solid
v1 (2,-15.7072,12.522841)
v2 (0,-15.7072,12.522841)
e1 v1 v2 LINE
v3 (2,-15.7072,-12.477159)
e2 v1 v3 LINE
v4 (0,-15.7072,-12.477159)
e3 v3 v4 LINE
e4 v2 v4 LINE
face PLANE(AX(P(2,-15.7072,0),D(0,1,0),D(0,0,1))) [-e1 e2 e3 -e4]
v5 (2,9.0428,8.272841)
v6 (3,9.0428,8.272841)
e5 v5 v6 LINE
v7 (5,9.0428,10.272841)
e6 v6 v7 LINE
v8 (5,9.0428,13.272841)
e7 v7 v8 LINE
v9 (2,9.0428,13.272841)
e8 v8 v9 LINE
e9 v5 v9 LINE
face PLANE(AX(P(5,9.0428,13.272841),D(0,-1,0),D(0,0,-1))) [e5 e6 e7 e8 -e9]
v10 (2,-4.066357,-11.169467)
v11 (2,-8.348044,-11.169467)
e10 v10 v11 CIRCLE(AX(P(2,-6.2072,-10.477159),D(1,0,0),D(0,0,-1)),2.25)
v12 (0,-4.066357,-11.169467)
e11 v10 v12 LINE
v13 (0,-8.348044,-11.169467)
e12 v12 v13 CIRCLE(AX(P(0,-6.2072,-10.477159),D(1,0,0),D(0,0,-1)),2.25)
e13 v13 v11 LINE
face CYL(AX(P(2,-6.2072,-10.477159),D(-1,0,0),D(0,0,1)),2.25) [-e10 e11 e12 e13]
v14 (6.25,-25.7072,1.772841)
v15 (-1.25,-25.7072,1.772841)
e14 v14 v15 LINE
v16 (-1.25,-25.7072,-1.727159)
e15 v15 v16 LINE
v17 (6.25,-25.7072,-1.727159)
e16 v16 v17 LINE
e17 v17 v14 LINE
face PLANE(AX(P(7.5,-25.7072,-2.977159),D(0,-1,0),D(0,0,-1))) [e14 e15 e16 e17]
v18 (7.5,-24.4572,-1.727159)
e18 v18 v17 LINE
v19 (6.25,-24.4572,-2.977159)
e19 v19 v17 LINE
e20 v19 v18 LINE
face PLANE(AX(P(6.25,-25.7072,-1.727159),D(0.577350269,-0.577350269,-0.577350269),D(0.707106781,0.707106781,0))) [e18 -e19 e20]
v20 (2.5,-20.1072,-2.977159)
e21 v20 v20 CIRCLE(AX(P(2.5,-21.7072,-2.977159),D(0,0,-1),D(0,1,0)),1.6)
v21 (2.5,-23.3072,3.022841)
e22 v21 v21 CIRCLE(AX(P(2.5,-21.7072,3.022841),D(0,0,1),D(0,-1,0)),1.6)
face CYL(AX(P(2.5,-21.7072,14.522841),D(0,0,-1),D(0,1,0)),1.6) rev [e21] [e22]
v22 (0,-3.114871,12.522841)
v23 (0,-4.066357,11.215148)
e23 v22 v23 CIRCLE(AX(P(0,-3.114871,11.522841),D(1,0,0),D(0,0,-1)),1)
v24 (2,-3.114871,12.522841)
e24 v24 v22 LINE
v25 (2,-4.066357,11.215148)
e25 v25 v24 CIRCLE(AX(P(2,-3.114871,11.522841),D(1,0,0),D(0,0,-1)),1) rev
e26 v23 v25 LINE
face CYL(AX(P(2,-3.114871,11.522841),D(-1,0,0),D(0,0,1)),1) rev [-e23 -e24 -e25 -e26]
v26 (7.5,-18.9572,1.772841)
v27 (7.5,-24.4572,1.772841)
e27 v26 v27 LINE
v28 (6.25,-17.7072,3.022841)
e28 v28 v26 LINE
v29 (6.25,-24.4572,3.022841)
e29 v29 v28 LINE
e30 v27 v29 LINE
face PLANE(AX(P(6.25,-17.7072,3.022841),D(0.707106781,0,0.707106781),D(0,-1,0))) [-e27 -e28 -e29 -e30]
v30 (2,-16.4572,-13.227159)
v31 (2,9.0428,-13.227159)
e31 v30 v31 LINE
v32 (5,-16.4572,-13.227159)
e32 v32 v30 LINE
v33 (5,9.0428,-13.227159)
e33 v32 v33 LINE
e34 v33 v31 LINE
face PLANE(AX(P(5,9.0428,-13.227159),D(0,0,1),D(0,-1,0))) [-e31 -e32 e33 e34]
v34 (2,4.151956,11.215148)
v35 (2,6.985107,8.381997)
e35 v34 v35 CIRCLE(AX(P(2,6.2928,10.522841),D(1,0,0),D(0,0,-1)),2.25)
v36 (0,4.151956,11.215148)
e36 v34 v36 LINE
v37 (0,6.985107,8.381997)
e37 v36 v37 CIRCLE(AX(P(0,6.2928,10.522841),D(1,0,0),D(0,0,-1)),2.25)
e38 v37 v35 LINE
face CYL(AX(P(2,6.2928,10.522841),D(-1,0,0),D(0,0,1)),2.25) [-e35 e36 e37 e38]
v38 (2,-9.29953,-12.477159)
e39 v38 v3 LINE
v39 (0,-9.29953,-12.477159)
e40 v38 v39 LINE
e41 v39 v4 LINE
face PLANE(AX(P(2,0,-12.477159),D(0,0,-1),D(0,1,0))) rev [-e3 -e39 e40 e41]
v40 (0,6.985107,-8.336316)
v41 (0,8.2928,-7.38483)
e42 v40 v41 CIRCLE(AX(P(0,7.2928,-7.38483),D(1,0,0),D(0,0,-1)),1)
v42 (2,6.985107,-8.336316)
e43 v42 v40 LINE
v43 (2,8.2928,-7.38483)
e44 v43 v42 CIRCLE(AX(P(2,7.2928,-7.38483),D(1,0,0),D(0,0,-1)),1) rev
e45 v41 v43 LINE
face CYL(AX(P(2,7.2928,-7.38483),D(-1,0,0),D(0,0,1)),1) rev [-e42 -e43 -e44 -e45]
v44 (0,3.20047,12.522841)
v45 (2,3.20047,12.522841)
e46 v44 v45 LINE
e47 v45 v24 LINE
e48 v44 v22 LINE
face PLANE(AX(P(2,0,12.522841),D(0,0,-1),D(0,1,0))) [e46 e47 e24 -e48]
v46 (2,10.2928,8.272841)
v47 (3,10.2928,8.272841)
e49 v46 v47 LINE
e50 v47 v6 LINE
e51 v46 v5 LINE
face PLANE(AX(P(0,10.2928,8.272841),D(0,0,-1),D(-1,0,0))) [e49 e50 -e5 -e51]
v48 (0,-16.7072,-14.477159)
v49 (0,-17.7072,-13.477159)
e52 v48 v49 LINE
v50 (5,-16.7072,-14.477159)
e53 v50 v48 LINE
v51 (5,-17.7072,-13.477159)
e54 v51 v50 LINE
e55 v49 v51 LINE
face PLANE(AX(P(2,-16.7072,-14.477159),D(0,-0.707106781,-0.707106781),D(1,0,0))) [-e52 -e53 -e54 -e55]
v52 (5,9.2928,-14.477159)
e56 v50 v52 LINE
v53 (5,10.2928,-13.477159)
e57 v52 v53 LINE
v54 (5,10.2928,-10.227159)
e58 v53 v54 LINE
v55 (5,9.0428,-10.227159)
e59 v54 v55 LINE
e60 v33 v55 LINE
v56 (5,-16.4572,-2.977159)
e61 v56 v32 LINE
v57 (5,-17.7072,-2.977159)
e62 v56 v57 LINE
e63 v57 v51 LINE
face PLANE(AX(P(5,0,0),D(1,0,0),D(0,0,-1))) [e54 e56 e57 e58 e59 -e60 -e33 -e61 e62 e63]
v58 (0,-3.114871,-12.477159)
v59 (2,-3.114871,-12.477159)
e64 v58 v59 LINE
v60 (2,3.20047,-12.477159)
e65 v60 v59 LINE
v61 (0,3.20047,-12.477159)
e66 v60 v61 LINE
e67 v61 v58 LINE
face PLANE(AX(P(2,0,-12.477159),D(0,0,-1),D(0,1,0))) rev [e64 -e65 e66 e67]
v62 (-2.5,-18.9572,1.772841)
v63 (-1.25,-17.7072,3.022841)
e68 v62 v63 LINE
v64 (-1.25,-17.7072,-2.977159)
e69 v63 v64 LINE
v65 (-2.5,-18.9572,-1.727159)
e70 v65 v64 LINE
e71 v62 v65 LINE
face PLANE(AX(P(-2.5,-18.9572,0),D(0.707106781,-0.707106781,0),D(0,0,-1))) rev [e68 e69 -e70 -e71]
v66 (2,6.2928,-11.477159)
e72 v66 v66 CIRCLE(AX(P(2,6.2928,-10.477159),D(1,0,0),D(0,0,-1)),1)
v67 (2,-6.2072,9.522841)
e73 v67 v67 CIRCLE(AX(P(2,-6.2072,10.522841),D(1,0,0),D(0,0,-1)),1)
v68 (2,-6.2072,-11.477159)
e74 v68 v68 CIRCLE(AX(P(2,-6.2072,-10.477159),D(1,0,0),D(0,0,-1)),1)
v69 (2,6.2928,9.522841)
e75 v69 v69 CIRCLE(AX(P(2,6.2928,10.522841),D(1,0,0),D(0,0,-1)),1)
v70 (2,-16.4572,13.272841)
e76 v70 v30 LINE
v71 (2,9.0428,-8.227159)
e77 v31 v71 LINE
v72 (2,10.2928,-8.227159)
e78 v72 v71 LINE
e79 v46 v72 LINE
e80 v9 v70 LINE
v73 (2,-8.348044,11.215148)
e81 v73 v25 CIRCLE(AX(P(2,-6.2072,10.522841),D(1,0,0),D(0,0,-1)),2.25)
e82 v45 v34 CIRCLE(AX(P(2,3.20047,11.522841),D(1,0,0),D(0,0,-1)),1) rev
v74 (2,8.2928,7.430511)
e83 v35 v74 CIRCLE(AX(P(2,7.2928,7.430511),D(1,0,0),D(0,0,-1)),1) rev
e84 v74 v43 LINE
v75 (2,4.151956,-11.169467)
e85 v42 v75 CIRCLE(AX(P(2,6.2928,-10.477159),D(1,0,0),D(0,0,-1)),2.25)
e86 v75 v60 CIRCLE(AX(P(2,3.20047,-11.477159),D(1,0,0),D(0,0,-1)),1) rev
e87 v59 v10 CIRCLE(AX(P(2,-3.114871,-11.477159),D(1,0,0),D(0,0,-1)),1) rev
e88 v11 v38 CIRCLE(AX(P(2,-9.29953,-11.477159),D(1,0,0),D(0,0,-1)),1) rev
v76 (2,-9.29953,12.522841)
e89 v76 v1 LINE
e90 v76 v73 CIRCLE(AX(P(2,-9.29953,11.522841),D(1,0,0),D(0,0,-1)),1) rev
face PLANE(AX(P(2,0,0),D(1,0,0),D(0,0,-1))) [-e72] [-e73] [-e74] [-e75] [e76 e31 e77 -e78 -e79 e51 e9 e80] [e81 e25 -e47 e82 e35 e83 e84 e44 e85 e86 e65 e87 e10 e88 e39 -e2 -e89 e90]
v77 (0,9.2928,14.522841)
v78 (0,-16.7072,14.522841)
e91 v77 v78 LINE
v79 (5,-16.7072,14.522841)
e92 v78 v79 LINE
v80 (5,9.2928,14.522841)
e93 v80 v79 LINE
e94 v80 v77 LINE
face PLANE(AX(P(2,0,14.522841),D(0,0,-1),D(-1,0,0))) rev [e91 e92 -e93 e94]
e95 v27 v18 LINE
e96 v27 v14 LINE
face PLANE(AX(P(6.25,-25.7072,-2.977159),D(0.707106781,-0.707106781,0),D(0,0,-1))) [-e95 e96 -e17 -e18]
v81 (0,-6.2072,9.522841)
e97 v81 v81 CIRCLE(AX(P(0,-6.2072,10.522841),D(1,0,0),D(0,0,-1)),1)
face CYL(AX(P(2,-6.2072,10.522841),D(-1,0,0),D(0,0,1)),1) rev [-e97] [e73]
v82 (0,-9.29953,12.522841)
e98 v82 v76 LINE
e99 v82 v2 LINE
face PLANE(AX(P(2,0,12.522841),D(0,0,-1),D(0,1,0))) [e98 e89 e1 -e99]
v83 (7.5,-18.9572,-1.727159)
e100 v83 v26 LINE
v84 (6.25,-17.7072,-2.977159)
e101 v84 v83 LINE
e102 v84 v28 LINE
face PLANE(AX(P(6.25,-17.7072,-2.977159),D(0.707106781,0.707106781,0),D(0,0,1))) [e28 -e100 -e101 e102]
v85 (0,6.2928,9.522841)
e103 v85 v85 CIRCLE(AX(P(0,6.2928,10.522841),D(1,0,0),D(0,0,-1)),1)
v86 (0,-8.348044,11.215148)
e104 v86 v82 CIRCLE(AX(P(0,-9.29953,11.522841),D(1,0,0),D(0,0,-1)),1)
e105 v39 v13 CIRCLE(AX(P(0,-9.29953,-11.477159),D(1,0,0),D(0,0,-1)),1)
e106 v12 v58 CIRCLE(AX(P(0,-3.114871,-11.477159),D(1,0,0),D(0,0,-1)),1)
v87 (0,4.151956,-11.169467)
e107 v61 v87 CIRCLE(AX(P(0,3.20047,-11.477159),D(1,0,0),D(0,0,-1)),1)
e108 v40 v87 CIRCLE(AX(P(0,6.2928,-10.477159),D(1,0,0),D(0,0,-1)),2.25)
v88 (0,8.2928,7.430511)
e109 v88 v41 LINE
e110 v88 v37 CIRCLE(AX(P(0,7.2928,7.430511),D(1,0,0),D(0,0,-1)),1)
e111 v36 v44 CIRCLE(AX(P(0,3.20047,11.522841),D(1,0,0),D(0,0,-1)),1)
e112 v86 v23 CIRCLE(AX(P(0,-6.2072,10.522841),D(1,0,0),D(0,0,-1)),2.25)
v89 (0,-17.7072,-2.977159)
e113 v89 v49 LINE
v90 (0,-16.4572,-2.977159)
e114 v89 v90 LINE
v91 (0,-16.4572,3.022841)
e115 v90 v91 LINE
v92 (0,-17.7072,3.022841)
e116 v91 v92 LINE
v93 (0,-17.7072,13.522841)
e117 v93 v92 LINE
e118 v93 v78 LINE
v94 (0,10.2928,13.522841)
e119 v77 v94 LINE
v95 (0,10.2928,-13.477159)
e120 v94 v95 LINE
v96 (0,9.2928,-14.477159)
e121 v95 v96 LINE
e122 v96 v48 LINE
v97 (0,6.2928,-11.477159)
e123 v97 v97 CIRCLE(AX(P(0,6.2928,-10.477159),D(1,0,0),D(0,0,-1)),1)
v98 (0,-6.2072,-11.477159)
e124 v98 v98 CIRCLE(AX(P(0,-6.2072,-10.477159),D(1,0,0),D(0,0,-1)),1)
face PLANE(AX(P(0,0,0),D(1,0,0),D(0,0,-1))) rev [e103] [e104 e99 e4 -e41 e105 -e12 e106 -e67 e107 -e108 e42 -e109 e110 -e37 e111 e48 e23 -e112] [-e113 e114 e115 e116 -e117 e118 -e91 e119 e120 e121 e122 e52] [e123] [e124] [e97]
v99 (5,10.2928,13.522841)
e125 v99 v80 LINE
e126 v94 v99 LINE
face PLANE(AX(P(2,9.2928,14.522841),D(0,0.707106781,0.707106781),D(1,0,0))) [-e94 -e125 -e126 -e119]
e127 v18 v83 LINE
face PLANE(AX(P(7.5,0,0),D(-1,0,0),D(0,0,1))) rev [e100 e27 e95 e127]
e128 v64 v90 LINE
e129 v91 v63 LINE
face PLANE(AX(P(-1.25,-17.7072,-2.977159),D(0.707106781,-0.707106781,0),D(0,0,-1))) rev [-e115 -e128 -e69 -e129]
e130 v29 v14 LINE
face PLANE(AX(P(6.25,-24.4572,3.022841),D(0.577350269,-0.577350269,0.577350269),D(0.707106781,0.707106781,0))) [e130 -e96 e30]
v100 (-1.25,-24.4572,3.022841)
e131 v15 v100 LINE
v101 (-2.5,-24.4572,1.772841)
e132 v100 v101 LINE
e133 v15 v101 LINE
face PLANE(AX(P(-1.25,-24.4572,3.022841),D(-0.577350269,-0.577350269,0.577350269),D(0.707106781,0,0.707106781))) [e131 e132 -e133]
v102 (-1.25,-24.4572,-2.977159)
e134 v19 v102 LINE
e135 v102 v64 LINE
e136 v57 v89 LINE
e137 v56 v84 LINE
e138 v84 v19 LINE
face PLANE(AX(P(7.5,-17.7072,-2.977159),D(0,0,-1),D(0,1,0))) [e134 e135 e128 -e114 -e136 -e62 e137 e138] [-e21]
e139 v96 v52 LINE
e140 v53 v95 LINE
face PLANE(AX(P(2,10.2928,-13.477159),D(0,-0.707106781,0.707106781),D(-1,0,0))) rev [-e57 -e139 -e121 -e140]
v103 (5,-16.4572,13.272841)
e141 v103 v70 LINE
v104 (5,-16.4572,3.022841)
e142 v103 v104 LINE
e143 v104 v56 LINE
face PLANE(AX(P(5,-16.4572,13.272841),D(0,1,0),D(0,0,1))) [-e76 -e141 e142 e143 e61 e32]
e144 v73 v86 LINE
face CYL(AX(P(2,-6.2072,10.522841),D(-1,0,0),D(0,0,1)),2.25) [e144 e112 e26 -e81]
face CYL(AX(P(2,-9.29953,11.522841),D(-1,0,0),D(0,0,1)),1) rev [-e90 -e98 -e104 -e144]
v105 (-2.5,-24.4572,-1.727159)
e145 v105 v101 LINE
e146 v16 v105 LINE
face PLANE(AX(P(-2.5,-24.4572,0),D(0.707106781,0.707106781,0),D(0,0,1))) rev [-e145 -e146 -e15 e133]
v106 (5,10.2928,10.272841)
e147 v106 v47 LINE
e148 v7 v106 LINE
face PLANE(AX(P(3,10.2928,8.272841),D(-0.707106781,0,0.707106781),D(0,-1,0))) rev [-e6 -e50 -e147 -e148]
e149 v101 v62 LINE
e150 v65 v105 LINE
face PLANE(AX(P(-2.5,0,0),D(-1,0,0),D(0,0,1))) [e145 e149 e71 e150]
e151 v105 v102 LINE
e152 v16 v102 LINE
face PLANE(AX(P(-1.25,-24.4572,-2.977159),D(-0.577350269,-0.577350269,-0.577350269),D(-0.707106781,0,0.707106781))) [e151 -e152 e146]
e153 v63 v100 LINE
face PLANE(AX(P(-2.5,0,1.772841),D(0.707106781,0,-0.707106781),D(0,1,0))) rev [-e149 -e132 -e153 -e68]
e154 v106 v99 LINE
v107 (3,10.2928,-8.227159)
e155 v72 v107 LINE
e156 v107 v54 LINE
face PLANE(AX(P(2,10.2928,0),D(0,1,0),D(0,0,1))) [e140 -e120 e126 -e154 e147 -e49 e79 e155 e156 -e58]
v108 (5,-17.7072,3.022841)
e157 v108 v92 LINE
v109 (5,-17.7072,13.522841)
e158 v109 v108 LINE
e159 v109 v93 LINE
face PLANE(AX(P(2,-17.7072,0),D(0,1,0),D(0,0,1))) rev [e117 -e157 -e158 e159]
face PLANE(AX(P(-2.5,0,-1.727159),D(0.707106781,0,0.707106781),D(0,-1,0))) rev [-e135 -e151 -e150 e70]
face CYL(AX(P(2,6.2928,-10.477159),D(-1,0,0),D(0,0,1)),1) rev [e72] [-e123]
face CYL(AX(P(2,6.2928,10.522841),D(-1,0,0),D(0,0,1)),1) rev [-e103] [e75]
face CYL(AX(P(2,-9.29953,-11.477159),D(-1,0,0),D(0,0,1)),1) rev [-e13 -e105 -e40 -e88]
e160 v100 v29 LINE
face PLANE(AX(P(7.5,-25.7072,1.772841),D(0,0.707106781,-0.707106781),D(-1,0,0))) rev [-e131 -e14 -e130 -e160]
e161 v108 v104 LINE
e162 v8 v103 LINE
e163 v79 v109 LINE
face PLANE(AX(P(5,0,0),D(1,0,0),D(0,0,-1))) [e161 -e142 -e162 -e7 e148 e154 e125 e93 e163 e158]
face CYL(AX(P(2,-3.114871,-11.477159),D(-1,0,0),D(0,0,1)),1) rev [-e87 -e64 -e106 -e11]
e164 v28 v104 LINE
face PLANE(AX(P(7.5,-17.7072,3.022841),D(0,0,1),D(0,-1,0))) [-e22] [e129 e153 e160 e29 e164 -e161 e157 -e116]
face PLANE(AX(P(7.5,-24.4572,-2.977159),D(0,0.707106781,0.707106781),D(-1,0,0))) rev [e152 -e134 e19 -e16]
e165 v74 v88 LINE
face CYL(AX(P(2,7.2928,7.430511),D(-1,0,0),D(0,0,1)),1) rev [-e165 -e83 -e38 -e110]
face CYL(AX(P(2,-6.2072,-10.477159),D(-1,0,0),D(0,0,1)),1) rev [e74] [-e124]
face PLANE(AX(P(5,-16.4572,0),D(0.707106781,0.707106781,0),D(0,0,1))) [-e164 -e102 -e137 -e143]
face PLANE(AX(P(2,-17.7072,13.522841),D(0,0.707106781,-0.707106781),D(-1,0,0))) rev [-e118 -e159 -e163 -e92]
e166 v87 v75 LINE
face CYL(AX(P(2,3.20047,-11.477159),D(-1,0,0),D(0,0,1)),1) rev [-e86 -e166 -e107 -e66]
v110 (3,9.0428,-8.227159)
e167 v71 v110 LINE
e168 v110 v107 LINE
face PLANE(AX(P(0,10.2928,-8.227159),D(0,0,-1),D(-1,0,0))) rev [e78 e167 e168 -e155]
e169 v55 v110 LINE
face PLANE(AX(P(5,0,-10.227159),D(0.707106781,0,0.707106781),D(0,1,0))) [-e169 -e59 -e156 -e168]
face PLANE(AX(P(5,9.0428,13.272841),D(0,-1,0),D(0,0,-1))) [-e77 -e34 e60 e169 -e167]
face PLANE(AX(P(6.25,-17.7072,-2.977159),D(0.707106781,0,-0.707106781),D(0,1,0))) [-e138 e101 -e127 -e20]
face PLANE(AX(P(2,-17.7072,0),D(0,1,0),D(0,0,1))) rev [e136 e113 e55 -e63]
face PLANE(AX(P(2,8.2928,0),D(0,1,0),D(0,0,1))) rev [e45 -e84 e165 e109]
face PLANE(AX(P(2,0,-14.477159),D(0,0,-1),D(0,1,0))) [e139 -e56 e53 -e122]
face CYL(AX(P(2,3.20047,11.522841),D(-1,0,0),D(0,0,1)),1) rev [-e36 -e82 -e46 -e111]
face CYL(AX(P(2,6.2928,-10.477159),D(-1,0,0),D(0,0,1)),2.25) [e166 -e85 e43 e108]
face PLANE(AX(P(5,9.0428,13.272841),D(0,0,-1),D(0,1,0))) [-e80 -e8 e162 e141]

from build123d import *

# Parameters (mm, degrees)
SKETCH1_W                = 29
SKETCH1_H                = 28
SKETCH1_R                = 1
BOSS_EXTRUDE1_DEPTH      = 2
SKETCH2_W                = 29
SKETCH2_H                = 28
SKETCH2_W_2              = 26.5
SKETCH2_H_2              = 25.5
BOSS_EXTRUDE2_DEPTH      = 3
FILLET1_R                = 1
BOSS_EXTRUDE3_DEPTH      = 2.5
BOSS_EXTRUDE3_DEPTH_BACK = 7.5
SKETCH3_W                = 6
SKETCH3_H                = 8
CHAMFER1_SIZE            = 1.25
CUT_EXTRUDE1_DEPTH       = 32.990000884
CUT_EXTRUDE1_DEPTH_BACK  = 32.990000884
SKETCH5_R                = 1.6
SKETCH7_W                = 3
SKETCH7_H                = 16.5
CUT_EXTRUDE2_DEPTH       = 39.40215359
CHAMFER2_SIZE            = 2
CHAMFER3_SIZE            = 1


with BuildPart() as part:
    # Sketch1 → Boss-Extrude1 (new body)
    with BuildSketch(Plane(origin=(0, 0, 0), x_dir=(0, 0, -1), z_dir=(1, 0, 0))):
        with Locations((-0.022840642, -3.707200481)):
            Rectangle(SKETCH1_W, SKETCH1_H)
        with BuildLine():
            ThreePointArc((-12.522840642, 5.262023113), (-8.931850385, 4.701809261), (-9.492064236, 8.292799519))
            Line((-9.492064236, 8.292799519), (9.446382951, 8.292799519))
            ThreePointArc((9.446382951, 8.292799519), (8.8861691, 4.701809261), (12.477159358, 5.262023113))
            Line((12.477159358, 5.262023113), (12.477159358, -5.176424074))
            ThreePointArc((12.477159358, -5.176424074), (8.227159358, -6.207200481), (12.477159358, -7.237976887))
            Line((12.477159358, -7.237976887), (12.477159358, -15.707200481))
            Line((12.477159358, -15.707200481), (-12.522840642, -15.707200481))
            Line((-12.522840642, -15.707200481), (-12.522840642, -7.237976887))
            ThreePointArc((-12.522840642, -7.237976887), (-8.272840642, -6.207200481), (-12.522840642, -5.176424074))
            Line((-12.522840642, -5.176424074), (-12.522840642, 5.262023113))
        make_face(mode=Mode.SUBTRACT)
        with Locations((-10.522840642, 6.292799519)):
            Circle(SKETCH1_R, mode=Mode.SUBTRACT)
        with Locations((-10.522840642, -6.207200481)):
            Circle(SKETCH1_R, mode=Mode.SUBTRACT)
        with Locations((10.477159358, -6.207200481)):
            Circle(SKETCH1_R, mode=Mode.SUBTRACT)
        with Locations((10.477159358, 6.292799519)):
            Circle(SKETCH1_R, mode=Mode.SUBTRACT)
    extrude(amount=BOSS_EXTRUDE1_DEPTH)

    # Sketch2 → Boss-Extrude2 (add)
    with BuildSketch(Plane(origin=(2, 0, 0), x_dir=(0, 0, -1), z_dir=(1, 0, 0))):
        with Locations((-0.022840642, -3.707200481)):
            Rectangle(SKETCH2_W, SKETCH2_H)
        with Locations((-0.022840642, -3.707200481)):
            Rectangle(SKETCH2_W_2, SKETCH2_H_2, mode=Mode.SUBTRACT)
    extrude(amount=BOSS_EXTRUDE2_DEPTH)

    # Fillet1
    fillet1_edges = [part.edges().sort_by_distance(p)[0] for p in [
        (1, 5.262023113, 12.522840642),
        (1, -5.176424074, 12.522840642),
        (1, -7.237976887, 12.522840642),
        (1, -7.237976887, -12.477159358),
        (1, -5.176424074, -12.477159358),
        (1, 5.262023113, -12.477159358),
        (1, 8.292799519, -9.446382951),
        (1, 8.292799519, 9.492064236),
    ]]
    fillet(fillet1_edges, radius=FILLET1_R)

    # Sketch3 → Boss-Extrude3 (add, two sides: drawn at the far end of the back side and taken through both)
    with BuildSketch(Plane.ZY.offset(-BOSS_EXTRUDE3_DEPTH_BACK)):
        with Locations((0.022840642, -21.707200481)):
            Rectangle(SKETCH3_W, SKETCH3_H)
    extrude(amount=BOSS_EXTRUDE3_DEPTH + BOSS_EXTRUDE3_DEPTH_BACK)

    # Chamfer1
    chamfer1_edges = [part.edges().sort_by_distance(p)[0] for p in [
        (2.5, -25.707200481, -2.977159358),
        (-2.5, -17.707200481, 0.022840642),
        (-2.5, -21.707200481, 3.022840642),
        (-2.5, -21.707200481, -2.977159358),
        (-2.5, -25.707200481, 0.022840642),
        (2.5, -25.707200481, 3.022840642),
        (7.5, -25.707200481, 0.022840642),
        (7.5, -21.707200481, 3.022840642),
        (7.5, -17.707200481, 0.022840642),
        (7.5, -21.707200481, -2.977159358),
        (5, -17.707200481, 0.022840642),
        (0, -17.707200481, 0.022840642),
    ]]
    chamfer(chamfer1_edges, length=CHAMFER1_SIZE - 0.0001)  # a hair under: the kernel refuses the full size

    # Sketch5 → Cut-Extrude1 (cut, two sides: drawn at the far end of the back side and taken through both)
    with BuildSketch(Plane(origin=(0, 0, -2.977159358), x_dir=(-1, 0, 0), z_dir=(0, 0, -1)).offset(-CUT_EXTRUDE1_DEPTH_BACK)):
        with Locations(Location((-2.5, -21.707200481, 0), (0, 0, 90))):
            Circle(SKETCH5_R)
    extrude(amount=CUT_EXTRUDE1_DEPTH + CUT_EXTRUDE1_DEPTH_BACK, mode=Mode.SUBTRACT)

    # Sketch7 → Cut-Extrude2 (cut, through all)
    with BuildSketch(Plane.XZ.offset(-9.042799519)):
        with Locations((3.5, 0.022840642)):
            Rectangle(SKETCH7_W, SKETCH7_H)
    extrude(amount=-CUT_EXTRUDE2_DEPTH, mode=Mode.SUBTRACT)

    # Chamfer2
    chamfer2_edges = [part.edges().sort_by_distance(p)[0] for p in [
        (5, 9.667799519, 8.272840642),
        (5, 9.667799519, -8.227159358),
    ]]
    chamfer(chamfer2_edges, length=CHAMFER2_SIZE)

    # Chamfer3
    chamfer3_edges = [part.edges().sort_by_distance(p)[0] for p in [
        (2.5, 10.292799519, -14.477159358),
        (2.5, -17.707200481, -14.477159358),
        (2.5, -17.707200481, 14.522840642),
        (2.5, 10.292799519, 14.522840642),
    ]]
    chamfer(chamfer3_edges, length=CHAMFER3_SIZE)


solid = part.part
